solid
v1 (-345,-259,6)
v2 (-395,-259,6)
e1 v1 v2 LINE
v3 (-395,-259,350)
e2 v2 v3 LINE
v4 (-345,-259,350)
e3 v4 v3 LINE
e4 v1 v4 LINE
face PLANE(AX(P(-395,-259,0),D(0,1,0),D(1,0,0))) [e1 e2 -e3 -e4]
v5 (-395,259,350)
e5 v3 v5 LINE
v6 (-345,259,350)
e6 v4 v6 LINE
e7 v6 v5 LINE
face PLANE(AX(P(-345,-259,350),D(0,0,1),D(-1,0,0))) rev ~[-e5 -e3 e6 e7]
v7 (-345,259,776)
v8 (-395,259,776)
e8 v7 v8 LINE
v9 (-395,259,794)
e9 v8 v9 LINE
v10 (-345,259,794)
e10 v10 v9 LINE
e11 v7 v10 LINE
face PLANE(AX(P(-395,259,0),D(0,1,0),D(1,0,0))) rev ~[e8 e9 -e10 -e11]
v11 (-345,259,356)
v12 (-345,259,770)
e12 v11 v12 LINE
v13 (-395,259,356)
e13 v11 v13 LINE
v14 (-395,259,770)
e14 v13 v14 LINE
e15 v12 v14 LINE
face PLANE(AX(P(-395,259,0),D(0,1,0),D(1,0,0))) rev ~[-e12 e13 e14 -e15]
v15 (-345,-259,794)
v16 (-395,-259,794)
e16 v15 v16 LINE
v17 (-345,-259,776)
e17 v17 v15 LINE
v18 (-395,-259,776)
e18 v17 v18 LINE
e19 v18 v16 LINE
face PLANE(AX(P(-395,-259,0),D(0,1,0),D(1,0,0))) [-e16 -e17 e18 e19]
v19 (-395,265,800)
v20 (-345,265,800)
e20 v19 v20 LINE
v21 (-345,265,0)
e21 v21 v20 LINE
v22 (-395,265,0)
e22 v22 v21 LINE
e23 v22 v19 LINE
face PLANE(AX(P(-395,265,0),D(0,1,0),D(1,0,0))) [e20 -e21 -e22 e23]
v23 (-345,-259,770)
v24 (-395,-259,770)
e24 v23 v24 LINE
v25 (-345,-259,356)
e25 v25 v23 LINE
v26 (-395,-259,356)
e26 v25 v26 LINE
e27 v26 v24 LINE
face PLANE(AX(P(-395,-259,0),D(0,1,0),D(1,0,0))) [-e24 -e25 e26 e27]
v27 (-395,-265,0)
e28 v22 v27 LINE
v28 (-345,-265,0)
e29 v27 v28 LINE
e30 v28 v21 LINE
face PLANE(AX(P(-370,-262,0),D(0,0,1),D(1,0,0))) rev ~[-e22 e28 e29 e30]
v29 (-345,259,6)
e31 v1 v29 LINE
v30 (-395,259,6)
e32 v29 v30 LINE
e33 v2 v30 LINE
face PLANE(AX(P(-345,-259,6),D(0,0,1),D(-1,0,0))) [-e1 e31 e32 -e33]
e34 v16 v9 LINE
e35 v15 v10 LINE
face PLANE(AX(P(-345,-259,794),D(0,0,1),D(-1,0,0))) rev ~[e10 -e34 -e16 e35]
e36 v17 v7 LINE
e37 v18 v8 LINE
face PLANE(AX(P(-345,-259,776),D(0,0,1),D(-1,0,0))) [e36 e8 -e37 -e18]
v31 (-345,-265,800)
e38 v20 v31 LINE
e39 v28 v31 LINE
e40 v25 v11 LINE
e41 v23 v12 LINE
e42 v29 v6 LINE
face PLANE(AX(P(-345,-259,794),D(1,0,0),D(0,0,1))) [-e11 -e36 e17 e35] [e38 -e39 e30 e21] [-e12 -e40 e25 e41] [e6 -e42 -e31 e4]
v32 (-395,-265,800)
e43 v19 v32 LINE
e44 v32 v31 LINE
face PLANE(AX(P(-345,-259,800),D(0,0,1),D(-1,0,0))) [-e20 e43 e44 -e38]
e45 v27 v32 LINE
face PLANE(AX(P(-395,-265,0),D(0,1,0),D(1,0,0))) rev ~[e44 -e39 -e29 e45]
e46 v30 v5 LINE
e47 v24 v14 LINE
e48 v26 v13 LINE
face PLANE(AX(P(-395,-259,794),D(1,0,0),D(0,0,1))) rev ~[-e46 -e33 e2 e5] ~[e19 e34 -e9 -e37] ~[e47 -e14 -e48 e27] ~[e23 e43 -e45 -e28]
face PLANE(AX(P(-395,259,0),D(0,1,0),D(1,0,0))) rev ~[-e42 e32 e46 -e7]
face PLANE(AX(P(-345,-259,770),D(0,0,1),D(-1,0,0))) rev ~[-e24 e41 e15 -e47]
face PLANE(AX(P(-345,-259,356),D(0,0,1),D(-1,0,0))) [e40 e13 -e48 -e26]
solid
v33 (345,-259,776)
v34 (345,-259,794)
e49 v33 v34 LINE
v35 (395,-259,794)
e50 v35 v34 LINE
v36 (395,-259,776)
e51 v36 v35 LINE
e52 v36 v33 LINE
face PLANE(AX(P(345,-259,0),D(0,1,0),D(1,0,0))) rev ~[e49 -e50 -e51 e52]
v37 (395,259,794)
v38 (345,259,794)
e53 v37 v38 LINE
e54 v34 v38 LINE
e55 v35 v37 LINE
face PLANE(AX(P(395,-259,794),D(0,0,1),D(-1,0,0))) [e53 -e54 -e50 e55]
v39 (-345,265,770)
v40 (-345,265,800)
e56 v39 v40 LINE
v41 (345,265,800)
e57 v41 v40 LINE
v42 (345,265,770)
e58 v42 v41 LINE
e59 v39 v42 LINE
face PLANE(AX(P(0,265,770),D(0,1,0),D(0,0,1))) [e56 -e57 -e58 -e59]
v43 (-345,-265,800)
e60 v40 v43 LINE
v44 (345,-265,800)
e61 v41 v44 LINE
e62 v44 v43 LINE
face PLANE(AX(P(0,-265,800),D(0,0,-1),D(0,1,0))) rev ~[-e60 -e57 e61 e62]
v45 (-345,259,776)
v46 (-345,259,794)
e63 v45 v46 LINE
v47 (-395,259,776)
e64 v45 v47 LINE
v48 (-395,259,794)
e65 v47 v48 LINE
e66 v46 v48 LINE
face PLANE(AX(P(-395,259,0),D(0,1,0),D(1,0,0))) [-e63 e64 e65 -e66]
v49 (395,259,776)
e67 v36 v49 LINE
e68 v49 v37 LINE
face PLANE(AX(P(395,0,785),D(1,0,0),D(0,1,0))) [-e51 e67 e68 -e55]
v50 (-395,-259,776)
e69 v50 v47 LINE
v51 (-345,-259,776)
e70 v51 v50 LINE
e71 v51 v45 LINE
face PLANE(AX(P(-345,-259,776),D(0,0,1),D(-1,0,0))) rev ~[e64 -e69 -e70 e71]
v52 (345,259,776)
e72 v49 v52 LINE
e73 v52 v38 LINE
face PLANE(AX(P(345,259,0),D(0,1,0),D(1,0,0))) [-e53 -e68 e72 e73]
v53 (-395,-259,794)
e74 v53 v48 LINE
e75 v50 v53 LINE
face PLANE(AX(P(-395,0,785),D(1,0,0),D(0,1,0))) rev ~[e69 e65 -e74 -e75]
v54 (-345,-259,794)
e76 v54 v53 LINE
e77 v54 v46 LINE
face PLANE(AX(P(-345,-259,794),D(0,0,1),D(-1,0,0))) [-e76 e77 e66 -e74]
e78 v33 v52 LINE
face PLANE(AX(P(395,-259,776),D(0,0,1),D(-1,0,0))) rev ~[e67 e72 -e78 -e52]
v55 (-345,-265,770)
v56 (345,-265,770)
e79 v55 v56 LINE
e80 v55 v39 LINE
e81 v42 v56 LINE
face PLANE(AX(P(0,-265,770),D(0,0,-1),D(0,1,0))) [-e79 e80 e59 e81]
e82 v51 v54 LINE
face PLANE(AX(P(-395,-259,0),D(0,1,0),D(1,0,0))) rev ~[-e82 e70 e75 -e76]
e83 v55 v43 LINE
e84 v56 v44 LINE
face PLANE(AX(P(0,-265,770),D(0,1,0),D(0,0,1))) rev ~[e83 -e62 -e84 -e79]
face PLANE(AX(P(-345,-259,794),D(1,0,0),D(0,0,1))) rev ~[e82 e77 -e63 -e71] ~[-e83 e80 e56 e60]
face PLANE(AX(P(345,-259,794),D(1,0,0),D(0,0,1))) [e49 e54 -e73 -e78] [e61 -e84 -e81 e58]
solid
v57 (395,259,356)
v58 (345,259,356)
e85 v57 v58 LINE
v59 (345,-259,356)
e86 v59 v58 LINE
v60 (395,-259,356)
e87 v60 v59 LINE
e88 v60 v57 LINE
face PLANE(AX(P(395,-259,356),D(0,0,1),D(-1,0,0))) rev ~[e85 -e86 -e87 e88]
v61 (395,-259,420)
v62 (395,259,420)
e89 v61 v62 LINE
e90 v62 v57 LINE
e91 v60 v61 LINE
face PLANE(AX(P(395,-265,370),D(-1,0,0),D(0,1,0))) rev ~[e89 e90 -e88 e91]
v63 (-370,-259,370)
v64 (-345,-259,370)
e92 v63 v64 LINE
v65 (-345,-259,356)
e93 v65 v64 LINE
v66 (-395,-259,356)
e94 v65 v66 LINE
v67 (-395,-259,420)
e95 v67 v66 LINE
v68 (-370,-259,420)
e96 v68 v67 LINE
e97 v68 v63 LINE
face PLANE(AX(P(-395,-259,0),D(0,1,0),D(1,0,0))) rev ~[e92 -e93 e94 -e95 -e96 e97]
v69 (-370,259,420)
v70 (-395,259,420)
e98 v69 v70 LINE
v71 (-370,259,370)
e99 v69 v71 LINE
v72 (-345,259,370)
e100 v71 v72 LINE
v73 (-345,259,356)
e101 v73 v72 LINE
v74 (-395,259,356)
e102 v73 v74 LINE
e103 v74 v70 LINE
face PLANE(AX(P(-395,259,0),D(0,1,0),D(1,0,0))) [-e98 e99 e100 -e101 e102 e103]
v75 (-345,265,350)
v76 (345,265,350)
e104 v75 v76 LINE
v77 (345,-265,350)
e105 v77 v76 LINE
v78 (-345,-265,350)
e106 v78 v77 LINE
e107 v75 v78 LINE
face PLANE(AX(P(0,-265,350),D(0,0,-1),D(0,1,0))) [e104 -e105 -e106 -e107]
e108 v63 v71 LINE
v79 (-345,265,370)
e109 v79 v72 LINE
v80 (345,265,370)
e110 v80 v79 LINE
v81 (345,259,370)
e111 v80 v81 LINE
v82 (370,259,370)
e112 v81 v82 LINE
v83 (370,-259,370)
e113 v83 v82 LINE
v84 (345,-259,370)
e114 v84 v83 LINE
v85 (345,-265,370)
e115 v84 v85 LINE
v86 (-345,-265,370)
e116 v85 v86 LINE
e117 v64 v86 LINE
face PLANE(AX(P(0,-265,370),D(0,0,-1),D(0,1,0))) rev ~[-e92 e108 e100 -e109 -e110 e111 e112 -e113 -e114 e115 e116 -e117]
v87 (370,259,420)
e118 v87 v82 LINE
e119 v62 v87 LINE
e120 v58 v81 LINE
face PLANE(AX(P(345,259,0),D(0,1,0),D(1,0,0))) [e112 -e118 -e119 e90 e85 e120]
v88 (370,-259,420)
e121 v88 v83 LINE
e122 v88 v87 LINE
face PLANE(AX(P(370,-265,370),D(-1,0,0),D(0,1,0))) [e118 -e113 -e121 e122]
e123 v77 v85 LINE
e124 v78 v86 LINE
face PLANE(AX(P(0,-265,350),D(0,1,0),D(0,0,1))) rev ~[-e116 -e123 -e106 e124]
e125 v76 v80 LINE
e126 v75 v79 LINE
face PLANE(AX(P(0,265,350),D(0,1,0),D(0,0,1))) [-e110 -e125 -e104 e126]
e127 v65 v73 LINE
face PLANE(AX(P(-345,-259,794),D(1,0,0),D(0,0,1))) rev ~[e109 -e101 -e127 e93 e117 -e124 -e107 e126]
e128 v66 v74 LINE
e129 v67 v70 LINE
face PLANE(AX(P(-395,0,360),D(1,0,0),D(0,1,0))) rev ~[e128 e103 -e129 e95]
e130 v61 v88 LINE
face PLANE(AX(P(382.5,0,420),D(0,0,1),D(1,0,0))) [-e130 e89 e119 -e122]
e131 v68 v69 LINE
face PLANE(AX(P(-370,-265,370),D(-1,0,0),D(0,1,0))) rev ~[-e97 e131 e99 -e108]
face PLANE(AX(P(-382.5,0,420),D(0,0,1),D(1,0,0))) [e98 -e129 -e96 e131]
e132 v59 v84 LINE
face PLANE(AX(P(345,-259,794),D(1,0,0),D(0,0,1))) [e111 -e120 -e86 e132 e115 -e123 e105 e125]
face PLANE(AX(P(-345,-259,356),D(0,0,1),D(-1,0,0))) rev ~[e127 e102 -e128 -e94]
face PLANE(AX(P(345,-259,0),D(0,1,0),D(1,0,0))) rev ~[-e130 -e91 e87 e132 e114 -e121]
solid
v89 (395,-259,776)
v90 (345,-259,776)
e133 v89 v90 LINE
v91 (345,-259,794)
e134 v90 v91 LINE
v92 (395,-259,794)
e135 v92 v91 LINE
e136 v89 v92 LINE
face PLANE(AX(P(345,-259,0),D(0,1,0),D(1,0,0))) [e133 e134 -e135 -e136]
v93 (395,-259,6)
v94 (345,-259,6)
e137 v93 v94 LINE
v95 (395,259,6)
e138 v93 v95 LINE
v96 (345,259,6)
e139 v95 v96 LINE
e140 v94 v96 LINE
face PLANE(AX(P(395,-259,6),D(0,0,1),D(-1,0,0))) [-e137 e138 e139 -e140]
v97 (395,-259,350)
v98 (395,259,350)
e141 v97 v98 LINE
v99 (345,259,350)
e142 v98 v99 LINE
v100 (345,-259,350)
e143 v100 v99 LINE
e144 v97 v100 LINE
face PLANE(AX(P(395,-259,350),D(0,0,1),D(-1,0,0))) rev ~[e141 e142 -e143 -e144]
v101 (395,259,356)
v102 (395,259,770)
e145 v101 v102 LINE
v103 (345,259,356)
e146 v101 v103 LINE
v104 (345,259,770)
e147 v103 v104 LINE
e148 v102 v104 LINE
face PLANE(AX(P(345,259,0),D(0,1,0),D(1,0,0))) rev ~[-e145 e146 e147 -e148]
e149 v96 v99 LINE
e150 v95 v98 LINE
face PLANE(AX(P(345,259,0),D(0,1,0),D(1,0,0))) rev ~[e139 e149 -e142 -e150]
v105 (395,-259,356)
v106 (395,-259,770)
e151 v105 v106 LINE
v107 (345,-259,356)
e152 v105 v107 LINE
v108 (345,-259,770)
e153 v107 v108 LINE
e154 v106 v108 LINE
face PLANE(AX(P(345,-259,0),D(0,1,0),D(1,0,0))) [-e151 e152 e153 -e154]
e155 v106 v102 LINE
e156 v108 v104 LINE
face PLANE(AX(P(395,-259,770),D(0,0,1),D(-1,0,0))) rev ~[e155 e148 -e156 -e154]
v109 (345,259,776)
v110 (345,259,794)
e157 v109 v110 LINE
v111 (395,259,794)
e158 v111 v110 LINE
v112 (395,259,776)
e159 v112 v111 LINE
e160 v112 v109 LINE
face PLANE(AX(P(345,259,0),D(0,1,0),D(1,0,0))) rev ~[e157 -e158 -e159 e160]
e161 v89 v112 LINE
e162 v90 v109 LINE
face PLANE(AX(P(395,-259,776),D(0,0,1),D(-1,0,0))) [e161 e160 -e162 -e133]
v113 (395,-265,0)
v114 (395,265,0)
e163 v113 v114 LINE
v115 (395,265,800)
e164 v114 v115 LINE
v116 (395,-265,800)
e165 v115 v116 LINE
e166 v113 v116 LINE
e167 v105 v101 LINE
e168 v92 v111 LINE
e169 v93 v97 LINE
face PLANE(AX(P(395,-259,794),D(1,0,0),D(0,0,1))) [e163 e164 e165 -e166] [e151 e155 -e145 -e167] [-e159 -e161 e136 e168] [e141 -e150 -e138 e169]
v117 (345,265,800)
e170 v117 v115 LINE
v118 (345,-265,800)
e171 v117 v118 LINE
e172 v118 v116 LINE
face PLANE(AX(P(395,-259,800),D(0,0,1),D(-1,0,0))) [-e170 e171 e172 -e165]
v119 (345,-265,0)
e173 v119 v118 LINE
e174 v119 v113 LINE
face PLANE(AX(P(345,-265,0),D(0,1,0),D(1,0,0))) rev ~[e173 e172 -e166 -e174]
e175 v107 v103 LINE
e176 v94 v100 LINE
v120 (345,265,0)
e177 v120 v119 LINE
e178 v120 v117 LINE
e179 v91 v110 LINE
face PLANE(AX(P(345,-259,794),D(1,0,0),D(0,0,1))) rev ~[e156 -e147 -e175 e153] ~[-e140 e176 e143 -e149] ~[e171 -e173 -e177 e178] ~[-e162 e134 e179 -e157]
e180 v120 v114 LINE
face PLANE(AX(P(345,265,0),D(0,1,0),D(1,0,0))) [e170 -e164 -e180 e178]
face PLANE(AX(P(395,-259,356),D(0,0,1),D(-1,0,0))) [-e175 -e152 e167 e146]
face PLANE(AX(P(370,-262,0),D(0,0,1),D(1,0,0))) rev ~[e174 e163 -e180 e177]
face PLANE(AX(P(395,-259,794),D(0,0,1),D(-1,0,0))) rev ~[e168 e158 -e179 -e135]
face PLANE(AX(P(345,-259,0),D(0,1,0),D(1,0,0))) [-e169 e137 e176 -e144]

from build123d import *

# Parameters (mm, degrees)
F2_W           = 50
F2_H           = 6
F3_DEPTH       = 800
F4_W           = 50
F4_H           = 6
F5_DEPTH       = 518
F10_W          = 530
F10_H          = 30
F11_DEPTH      = 395
F11_DEPTH_BACK = 395
F10_H_2        = 20
F14_W          = 25
F14_H          = 530
F15_DEPTH      = 50


with BuildPart() as f3:
    # F2 (on Top) → F3 (new body)
    with BuildSketch(Plane.XY):
        with Locations((-370, -262)):
            Rectangle(F2_W, F2_H)
    extrude(amount=F3_DEPTH)



with BuildPart() as f3b:
    # F2 (on Top) → F3, piece 2 (new body)
    with BuildSketch(Plane.XY):
        with Locations((-370, 262)):
            Rectangle(F2_W, F2_H)
    extrude(amount=F3_DEPTH)


with BuildPart() as f3c:
    # F2 (on Top) → F3, piece 3 (new body)
    with BuildSketch(Plane.XY):
        with Locations((370, -262)):
            Rectangle(F2_W, F2_H)
    extrude(amount=F3_DEPTH)



with BuildPart() as f3d:
    # F2 (on Top) → F3, piece 4 (new body)
    with BuildSketch(Plane.XY):
        with Locations((370, 262)):
            Rectangle(F2_W, F2_H)
    extrude(amount=F3_DEPTH)


with BuildPart() as f3c_1:
    add(f3c.part)

    add(f3d.part)  # F5 merges F3d
    # F4 (on face) → F5 (join, through all)
    with BuildSketch(Plane(origin=(0, -259, 0), x_dir=(-1, 0, 0), z_dir=(0, 1, 0))):
        with Locations((-370, 797)):
            Rectangle(F4_W, F4_H)
        with Locations((-370, 773)):
            Rectangle(F4_W, F4_H)
        with Locations((-370, 3)):
            Rectangle(F4_W, F4_H)
        with Locations((-370, 353)):
            Rectangle(F4_W, F4_H)
    extrude(amount=F5_DEPTH)

    # F6: union 

    # F8: union 


with BuildPart() as f3_1:
    add(f3.part)

    add(f3b.part)  # F5#2 merges F3b
    # F4 (on face) → F5, piece 2 (join, through all)
    with BuildSketch(Plane(origin=(0, -259, 0), x_dir=(-1, 0, 0), z_dir=(0, 1, 0))):
        with Locations((370, 773)):
            Rectangle(F4_W, F4_H)
        with Locations((370, 797)):
            Rectangle(F4_W, F4_H)
        with Locations((370, 3)):
            Rectangle(F4_W, F4_H)
        with Locations((370, 353)):
            Rectangle(F4_W, F4_H)
    extrude(amount=F5_DEPTH)

    # F7: union 

    # F9: union 


with BuildPart() as f11:
    # F10 (on Right) → F11 (new body, two sides)
    with BuildSketch(Plane.YZ) as f11_sk:
        with Locations((0, 785)):
            Rectangle(F10_W, F10_H)
    extrude(amount=F11_DEPTH)
    extrude(f11_sk.sketch, amount=-F11_DEPTH_BACK)

    # F13: cut F3, F3c
    add(f3_1.part, mode=Mode.SUBTRACT)
    add(f3c_1.part, mode=Mode.SUBTRACT)


with BuildPart() as f11b:
    # F10 (on Right) → F11, piece 2 (new body, two sides)
    with BuildSketch(Plane.YZ) as f11_2_sk:
        with Locations((0, 360)):
            Rectangle(F10_W, F10_H_2)
    extrude(amount=F11_DEPTH)
    extrude(f11_2_sk.sketch, amount=-F11_DEPTH_BACK)

    # F12: cut F3, F3c
    add(f3_1.part, mode=Mode.SUBTRACT)
    add(f3c_1.part, mode=Mode.SUBTRACT)

    # F14 (on face) → F15 (join)
    with BuildSketch(Plane.XY.offset(370)):
        with Locations((382.5, 0)):
            Rectangle(F14_W, F14_H)
        with Locations((-382.5, 0)):
            Rectangle(F14_W, F14_H)
    extrude(amount=F15_DEPTH)

    # F16: cut F3c, F3
    add(f3c_1.part, mode=Mode.SUBTRACT)
    add(f3_1.part, mode=Mode.SUBTRACT)


solid = Compound([f3c_1.part, f3_1.part, f11.part, f11b.part])
